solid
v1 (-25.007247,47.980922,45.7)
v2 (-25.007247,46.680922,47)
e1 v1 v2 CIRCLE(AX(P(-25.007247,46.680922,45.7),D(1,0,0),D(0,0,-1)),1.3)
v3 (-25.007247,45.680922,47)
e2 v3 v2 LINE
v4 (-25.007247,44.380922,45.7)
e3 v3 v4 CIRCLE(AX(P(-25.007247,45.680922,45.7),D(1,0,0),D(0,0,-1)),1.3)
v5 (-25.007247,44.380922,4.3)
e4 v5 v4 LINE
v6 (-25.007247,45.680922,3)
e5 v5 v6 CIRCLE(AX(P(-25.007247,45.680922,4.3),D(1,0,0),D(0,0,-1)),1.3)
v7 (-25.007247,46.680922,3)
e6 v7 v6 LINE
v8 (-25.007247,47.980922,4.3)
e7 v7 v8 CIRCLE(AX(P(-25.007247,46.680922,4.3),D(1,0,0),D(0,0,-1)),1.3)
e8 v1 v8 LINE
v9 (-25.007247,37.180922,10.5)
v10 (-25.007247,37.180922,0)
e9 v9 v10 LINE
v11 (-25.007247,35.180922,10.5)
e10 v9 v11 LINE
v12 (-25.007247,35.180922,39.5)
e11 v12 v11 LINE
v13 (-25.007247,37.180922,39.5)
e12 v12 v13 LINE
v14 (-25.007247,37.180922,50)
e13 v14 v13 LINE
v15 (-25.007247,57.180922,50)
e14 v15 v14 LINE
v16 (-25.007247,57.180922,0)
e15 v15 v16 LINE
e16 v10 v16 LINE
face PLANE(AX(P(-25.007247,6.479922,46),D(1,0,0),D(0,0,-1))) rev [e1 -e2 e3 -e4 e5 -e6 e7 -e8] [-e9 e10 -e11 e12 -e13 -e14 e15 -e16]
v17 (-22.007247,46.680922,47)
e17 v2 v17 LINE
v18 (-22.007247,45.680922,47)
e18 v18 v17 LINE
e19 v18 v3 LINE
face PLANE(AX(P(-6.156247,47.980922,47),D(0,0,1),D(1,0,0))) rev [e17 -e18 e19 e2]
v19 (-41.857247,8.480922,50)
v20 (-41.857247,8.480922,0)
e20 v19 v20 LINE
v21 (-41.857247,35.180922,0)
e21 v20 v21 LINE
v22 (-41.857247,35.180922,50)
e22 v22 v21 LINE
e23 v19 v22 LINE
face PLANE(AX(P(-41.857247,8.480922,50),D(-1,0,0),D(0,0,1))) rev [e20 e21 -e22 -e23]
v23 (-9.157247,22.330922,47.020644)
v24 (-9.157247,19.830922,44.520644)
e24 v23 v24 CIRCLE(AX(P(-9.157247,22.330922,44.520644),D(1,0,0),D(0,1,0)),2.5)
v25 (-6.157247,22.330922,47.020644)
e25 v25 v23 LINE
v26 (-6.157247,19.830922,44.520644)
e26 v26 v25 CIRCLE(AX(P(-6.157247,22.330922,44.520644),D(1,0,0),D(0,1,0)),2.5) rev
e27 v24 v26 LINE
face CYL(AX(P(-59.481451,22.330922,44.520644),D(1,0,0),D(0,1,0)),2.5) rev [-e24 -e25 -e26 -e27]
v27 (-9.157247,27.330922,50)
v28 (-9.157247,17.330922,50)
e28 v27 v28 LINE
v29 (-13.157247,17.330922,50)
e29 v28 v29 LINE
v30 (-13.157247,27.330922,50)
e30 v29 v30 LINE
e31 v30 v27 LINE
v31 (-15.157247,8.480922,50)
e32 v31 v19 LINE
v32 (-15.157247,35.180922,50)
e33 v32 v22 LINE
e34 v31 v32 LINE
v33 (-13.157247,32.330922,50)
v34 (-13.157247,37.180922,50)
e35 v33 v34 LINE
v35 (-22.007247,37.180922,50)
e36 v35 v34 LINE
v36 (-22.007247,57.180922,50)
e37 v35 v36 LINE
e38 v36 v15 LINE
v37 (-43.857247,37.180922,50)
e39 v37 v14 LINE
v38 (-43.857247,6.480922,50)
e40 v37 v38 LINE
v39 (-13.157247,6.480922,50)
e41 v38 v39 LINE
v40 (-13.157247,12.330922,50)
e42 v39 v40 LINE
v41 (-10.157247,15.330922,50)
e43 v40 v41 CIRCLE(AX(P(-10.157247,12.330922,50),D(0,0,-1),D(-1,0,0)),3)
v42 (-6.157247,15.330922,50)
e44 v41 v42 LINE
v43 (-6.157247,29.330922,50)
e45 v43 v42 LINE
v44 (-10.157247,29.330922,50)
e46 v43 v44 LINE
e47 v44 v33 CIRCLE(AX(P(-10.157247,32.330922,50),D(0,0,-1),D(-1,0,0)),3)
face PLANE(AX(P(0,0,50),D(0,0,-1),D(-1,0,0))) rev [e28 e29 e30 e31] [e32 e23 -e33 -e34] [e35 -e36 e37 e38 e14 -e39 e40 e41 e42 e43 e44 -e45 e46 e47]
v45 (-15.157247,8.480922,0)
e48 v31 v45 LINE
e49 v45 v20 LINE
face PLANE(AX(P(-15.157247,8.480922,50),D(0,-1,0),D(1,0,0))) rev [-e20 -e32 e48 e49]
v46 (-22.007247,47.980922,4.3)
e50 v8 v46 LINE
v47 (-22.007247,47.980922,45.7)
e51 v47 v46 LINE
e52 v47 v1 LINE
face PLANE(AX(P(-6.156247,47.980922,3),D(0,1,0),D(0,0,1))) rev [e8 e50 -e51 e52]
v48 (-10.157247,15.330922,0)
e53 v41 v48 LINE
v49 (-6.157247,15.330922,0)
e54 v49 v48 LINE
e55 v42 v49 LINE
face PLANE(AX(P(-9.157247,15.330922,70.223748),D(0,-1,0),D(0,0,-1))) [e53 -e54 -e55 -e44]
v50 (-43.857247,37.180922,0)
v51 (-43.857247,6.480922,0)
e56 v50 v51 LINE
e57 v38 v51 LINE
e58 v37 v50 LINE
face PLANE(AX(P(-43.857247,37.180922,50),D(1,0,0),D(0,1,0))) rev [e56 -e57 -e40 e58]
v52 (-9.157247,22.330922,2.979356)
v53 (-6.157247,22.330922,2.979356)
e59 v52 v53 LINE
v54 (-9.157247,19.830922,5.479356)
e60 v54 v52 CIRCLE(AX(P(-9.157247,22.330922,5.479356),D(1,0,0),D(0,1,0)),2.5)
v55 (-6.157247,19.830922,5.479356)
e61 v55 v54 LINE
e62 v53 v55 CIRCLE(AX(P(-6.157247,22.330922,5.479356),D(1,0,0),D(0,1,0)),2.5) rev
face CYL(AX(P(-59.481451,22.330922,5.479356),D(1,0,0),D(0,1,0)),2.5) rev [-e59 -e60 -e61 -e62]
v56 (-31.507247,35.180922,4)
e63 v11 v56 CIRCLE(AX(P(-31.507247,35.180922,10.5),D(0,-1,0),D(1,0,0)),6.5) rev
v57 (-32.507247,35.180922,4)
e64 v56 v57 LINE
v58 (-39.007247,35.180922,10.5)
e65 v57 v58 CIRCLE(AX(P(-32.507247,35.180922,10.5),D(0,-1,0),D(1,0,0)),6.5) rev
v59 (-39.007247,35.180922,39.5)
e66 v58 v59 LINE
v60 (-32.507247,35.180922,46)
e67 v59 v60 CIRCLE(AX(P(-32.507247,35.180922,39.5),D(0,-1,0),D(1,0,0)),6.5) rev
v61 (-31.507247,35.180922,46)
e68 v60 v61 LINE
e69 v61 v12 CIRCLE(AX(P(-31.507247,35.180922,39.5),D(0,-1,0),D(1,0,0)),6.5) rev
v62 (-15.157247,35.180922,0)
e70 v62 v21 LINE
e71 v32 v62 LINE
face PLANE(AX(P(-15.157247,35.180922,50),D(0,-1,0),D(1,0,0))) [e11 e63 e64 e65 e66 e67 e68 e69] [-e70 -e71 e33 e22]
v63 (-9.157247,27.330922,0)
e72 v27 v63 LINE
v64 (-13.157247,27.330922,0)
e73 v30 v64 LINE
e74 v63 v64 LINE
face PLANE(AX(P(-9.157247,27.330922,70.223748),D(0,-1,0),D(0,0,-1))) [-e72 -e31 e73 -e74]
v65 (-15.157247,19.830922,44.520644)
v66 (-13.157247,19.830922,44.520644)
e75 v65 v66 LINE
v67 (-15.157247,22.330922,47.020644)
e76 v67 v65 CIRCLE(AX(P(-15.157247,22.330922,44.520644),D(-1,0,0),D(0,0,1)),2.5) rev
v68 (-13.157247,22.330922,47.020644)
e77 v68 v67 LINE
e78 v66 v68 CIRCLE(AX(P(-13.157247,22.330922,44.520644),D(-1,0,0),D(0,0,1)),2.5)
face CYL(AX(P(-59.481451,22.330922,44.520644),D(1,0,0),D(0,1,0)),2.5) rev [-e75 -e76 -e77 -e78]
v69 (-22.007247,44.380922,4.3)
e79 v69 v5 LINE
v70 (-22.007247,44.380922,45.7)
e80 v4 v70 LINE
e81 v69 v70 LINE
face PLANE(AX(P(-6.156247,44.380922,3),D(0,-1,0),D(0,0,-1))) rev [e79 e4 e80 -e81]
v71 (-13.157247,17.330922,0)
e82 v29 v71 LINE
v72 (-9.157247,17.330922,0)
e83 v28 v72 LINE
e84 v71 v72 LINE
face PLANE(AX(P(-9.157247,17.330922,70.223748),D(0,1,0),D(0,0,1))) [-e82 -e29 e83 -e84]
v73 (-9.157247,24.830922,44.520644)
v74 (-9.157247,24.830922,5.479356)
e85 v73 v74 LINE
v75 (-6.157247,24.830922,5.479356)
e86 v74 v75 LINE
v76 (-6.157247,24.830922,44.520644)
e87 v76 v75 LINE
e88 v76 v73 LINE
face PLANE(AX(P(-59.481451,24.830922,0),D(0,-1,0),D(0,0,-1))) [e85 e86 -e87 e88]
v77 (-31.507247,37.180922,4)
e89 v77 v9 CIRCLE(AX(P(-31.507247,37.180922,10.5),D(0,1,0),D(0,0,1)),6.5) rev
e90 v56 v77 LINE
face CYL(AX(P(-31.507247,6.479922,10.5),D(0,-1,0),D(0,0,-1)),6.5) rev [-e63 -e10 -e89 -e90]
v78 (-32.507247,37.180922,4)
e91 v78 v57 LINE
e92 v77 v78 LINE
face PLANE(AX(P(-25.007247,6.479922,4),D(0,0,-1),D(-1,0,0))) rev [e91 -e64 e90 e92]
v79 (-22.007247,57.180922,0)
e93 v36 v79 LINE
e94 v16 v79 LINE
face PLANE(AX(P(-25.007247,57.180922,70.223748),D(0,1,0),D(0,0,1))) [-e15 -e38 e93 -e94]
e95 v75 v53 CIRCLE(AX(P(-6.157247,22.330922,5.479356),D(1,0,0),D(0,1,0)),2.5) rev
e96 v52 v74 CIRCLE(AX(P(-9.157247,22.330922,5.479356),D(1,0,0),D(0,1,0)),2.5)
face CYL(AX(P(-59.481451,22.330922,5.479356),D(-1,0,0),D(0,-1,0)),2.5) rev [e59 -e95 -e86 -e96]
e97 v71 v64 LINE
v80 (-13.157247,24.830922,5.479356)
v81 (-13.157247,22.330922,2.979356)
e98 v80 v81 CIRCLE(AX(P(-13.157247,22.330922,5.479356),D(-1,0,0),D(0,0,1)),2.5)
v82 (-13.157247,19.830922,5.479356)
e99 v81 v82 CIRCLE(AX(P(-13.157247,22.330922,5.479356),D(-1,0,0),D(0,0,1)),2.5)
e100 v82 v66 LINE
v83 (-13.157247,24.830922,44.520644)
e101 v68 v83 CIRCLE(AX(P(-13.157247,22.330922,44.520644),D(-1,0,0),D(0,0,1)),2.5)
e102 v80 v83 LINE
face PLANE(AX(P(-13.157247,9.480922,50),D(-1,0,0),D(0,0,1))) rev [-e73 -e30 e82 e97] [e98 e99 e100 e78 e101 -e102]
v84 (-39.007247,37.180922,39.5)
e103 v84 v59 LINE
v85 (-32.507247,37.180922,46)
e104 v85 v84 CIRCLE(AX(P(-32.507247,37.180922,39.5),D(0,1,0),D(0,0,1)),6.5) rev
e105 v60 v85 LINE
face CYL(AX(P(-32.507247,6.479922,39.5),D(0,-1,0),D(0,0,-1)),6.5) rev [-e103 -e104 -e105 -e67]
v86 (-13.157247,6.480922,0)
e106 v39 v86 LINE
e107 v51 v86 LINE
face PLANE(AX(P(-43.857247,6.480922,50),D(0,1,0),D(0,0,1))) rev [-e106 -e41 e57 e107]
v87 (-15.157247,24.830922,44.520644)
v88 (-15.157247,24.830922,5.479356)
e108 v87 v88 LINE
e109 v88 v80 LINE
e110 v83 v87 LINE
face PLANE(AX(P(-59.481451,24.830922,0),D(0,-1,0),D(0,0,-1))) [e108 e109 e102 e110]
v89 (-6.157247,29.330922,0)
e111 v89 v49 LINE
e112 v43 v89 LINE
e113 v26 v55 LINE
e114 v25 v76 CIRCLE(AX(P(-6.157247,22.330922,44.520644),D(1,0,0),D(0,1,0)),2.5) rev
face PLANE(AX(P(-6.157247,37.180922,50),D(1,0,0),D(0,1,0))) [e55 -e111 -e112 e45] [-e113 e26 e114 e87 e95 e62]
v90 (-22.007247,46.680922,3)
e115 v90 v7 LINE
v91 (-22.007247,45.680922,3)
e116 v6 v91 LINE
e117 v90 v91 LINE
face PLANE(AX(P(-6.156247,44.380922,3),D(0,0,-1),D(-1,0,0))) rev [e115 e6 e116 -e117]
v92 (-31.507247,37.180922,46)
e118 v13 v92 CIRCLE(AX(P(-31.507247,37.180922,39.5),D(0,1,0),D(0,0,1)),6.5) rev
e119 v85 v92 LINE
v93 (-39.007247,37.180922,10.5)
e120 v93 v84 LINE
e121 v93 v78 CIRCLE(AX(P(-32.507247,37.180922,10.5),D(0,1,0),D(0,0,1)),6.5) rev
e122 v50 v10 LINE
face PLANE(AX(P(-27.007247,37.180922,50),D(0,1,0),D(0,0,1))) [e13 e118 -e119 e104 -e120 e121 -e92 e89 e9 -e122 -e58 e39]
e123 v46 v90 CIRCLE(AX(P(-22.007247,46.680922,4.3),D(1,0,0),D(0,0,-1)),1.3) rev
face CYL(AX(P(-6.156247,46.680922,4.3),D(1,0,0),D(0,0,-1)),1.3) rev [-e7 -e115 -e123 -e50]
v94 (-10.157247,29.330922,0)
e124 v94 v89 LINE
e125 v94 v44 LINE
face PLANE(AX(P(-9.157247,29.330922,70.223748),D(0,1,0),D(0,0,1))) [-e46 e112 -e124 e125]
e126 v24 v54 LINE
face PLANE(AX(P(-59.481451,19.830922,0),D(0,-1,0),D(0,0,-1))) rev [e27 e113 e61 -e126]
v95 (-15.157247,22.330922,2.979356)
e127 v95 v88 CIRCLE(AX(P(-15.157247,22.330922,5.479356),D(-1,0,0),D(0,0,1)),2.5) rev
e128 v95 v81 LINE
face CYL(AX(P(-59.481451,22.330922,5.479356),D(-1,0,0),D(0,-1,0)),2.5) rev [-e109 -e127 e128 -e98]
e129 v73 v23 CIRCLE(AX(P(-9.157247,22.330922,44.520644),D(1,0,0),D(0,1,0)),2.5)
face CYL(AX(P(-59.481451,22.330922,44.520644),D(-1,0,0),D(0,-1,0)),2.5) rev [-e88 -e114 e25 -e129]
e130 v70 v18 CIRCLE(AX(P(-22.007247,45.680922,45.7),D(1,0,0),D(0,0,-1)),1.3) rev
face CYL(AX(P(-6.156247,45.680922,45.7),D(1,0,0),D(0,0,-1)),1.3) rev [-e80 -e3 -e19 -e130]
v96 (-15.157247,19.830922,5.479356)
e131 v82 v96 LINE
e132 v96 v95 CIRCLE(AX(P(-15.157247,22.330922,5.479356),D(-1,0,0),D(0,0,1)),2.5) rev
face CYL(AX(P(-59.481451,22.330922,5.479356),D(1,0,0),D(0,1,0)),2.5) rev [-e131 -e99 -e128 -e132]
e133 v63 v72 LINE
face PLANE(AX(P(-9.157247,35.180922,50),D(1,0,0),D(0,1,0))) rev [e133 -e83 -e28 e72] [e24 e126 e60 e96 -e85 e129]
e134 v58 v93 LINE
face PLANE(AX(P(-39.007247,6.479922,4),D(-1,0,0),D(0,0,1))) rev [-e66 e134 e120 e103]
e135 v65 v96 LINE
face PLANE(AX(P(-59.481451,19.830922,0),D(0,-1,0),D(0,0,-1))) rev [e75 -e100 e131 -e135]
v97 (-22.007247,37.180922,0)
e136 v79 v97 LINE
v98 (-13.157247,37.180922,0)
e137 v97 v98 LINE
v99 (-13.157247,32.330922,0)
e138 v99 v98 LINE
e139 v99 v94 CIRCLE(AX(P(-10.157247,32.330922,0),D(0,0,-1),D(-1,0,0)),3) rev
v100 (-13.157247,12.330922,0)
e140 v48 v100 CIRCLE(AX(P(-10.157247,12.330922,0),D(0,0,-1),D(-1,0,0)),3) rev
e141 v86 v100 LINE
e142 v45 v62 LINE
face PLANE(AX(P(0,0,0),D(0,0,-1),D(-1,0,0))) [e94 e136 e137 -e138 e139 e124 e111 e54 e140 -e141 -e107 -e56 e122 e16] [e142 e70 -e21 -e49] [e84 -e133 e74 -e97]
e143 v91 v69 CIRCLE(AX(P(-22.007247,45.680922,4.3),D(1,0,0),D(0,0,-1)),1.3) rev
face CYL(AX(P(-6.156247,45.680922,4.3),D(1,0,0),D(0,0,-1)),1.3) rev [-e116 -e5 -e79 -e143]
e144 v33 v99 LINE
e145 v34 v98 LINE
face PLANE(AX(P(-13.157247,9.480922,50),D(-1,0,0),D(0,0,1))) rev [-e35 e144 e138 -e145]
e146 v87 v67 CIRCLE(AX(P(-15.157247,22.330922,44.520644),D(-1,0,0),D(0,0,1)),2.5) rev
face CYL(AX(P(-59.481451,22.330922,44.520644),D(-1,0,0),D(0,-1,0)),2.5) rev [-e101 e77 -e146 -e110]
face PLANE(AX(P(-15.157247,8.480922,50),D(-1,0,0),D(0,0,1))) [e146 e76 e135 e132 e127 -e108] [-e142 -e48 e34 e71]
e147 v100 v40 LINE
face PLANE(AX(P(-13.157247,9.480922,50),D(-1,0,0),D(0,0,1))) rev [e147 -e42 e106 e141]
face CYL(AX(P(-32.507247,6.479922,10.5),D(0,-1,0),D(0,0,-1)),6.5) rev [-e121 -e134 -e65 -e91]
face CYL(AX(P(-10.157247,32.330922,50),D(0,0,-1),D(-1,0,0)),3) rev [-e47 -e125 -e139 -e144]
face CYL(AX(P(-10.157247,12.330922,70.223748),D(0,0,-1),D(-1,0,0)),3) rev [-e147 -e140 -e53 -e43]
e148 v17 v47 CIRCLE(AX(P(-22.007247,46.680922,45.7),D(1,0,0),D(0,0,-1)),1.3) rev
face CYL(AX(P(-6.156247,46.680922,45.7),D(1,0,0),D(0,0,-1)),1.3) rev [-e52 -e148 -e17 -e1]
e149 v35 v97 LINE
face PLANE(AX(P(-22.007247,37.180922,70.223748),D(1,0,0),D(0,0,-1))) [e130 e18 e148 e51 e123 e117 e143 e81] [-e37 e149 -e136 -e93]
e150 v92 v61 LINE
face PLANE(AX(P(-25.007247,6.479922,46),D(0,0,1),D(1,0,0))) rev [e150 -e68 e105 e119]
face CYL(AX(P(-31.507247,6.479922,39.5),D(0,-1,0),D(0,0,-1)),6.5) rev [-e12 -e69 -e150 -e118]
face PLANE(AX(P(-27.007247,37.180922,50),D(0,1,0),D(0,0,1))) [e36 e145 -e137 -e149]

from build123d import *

# Parameters (mm, degrees)
CROQUIS3_W              = 26.7
CROQUIS3_H              = 26.7
CROQUIS3_W_2            = 4
CROQUIS3_H_2            = 25.7
SALIENTE_EXTRUIR1_DEPTH = 50
CORTAR_EXTRUIR14_REACH  = 74.827
REDONDEO2_R             = 2.5
CORTAR_EXTRUIR19_REACH  = 75.253
CROQUIS18_W             = 7
CROQUIS18_H             = 42
CROQUIS19_W             = 4
CROQUIS19_H             = 2
CROQUIS19_W_2           = 3
CROQUIS19_H_2           = 20
SALIENTE_EXTRUIR3_DEPTH = 50
CORTAR_EXTRUIR20_REACH  = 80.262
CROQUIS20_W             = 44
CROQUIS20_H             = 3.6
CORTAR_EXTRUIR21_REACH  = 89.71
REDONDEO6_R             = 3
REDONDEO9_R             = 1.3
CORTAR_EXTRUIR22_REACH  = 75.253
CROQUIS22_W             = 7
CROQUIS22_H             = 42
REDONDEO10_R            = 6.5


with BuildPart() as part:
    # Croquis3 → Saliente-Extruir1 (new body)
    with BuildSketch(Plane.XY):
        Polygon((-43.857247249, 6.480922369), (-6.157247249, 6.480922369), (-6.157247249, 37.180922369), (-27.007247249, 37.180922369), (-43.857247249, 37.180922369), align=None)
        with Locations((-28.507247249, 21.830922369)):
            Rectangle(CROQUIS3_W, CROQUIS3_H, mode=Mode.SUBTRACT)
        with Locations((-11.157247249, 22.330922369)):
            Rectangle(CROQUIS3_W_2, CROQUIS3_H_2, mode=Mode.SUBTRACT)
    extrude(amount=SALIENTE_EXTRUIR1_DEPTH)

    # Cortar-Extruir14: up to this face of the body (flat: up to its plane)
    cortar_extruir14_end = Plane(part.part.faces().sort_by_distance((-15.157247249, 21.830922369, 25))[0])
    # Croquis14 → Cortar-Extruir14 (cut, up to the picked face)
    with BuildSketch(Plane(origin=(-6.157247249, 0, 0), x_dir=(0, 0, -1), z_dir=(1, 0, 0)), mode=Mode.PRIVATE) as cortar_extruir14_sk1:
        Polygon((-2.979356026, 22.330922369), (-2.979356026, 19.830922369), (-47.020643974, 19.830922369), (-47.020643974, 22.330922369), (-47.020643974, 24.830922369), (-2.979356026, 24.830922369), align=None)
    cortar_extruir14_tool1 = split(extrude(cortar_extruir14_sk1.sketch, amount=-CORTAR_EXTRUIR14_REACH, mode=Mode.PRIVATE), bisect_by=cortar_extruir14_end, keep=Keep.BOTH, mode=Mode.PRIVATE)
    add(cortar_extruir14_tool1.solids().sort_by(Axis((-6.157247, 22.330922, 25), (-1, 0, 0)))[0], mode=Mode.SUBTRACT)

    # Redondeo2
    redondeo2_edges = [part.edges().sort_by_distance(p)[0] for p in [
        (-14.157247249, 24.830922369, 2.979356026),
        (-7.657247249, 24.830922369, 2.979356026),
        (-7.657247249, 19.830922369, 2.979356026),
        (-14.157247249, 19.830922369, 2.979356026),
        (-14.157247249, 24.830922369, 47.020643974),
        (-7.657247249, 24.830922369, 47.020643974),
        (-7.657247249, 19.830922369, 47.020643974),
        (-14.157247249, 19.830922369, 47.020643974),
    ]]
    fillet(redondeo2_edges, radius=REDONDEO2_R - 0.0001)  # a hair under: the kernel refuses the full size

    # Croquis18 → Cortar-Extruir19 (cut, up to next)
    with BuildSketch(Plane(origin=(0, 37.180922369, 0), x_dir=(1, 0, 0), z_dir=(0, 1, 0)), mode=Mode.PRIVATE) as cortar_extruir19_sk1:
        with Locations((-28.507247249, -25)):
            Rectangle(CROQUIS18_W, CROQUIS18_H)
    cortar_extruir19_tool1 = extrude(cortar_extruir19_sk1.sketch, amount=-CORTAR_EXTRUIR19_REACH, mode=Mode.PRIVATE) & part.part
    add(cortar_extruir19_tool1.solids().sort_by_distance((-28.507247, 37.180922, 25))[0], mode=Mode.SUBTRACT)

    # Croquis19 → Saliente-Extruir3 (add)
    with BuildSketch(Plane(origin=(0, 0, 0), x_dir=(-1, 0, 0), z_dir=(0, 0, -1))):
        with Locations((11.157247249, 16.330922369)):
            Rectangle(CROQUIS19_W, CROQUIS19_H)
        with Locations((11.157247249, 28.330922369)):
            Rectangle(CROQUIS19_W, CROQUIS19_H)
        with Locations((23.507247249, 47.180922369)):
            Rectangle(CROQUIS19_W_2, CROQUIS19_H_2)
    extrude(amount=-SALIENTE_EXTRUIR3_DEPTH)

    # Croquis20 → Cortar-Extruir20 (cut, up to next)
    with BuildSketch(Plane.ZY.offset(25.007247249), mode=Mode.PRIVATE) as cortar_extruir20_sk1:
        with Locations((25, 46.180922369)):
            Rectangle(CROQUIS20_W, CROQUIS20_H)
    cortar_extruir20_tool1 = extrude(cortar_extruir20_sk1.sketch, amount=-CORTAR_EXTRUIR20_REACH, mode=Mode.PRIVATE) & part.part
    add(cortar_extruir20_tool1.solids().sort_by_distance((-25.007247, 46.180922, 25))[0], mode=Mode.SUBTRACT)

    # Croquis21 → Cortar-Extruir21 (cut, up to next)
    with BuildSketch(Plane(origin=(0, 0, 0), x_dir=(-1, 0, 0), z_dir=(0, 0, -1)), mode=Mode.PRIVATE) as cortar_extruir21_sk1:
        Polygon((13.157247249, 35.180922369), (13.157247249, 37.180922369), (6.157247249, 37.180922369), (6.157247249, 29.330922369), (9.157247249, 29.330922369), (9.157247249, 35.180922369), align=None)
    cortar_extruir21_tool1 = extrude(cortar_extruir21_sk1.sketch, amount=-CORTAR_EXTRUIR21_REACH, mode=Mode.PRIVATE) & part.part
    # Croquis21 → Cortar-Extruir21 (cut, up to next)
    with BuildSketch(Plane(origin=(0, 0, 0), x_dir=(-1, 0, 0), z_dir=(0, 0, -1)), mode=Mode.PRIVATE) as cortar_extruir21_sk2:
        Polygon((6.157247249, 9.480922369), (6.157247249, 15.330922369), (9.157247249, 15.330922369), (9.157247249, 9.480922369), (13.157247249, 9.480922369), (13.157247249, 6.480922369), (6.157247249, 6.480922369), align=None)
    cortar_extruir21_tool2 = extrude(cortar_extruir21_sk2.sketch, amount=-CORTAR_EXTRUIR21_REACH, mode=Mode.PRIVATE) & part.part
    add(cortar_extruir21_tool1.solids().sort_by_distance((-8.544727, 33.997602, 0))[0], mode=Mode.SUBTRACT)
    add(cortar_extruir21_tool2.solids().sort_by_distance((-8.746741, 9.995417, 0))[0], mode=Mode.SUBTRACT)

    # Redondeo6
    redondeo6_edges = [part.edges().sort_by_distance(p)[0] for p in [
        (-13.157247249, 15.330922369, 25),
        (-13.157247249, 29.330922369, 25),
    ]]
    fillet(redondeo6_edges, radius=REDONDEO6_R)

    # Redondeo9
    redondeo9_edges = [part.edges().sort_by_distance(p)[0] for p in [
        (-23.507247249, 47.980922369, 3),
        (-23.507247249, 47.980922369, 47),
        (-23.507247249, 44.380922369, 47),
        (-23.507247249, 44.380922369, 3),
    ]]
    fillet(redondeo9_edges, radius=REDONDEO9_R)

    # Croquis22 → Cortar-Extruir22 (cut, up to next)
    with BuildSketch(Plane(origin=(0, 37.180922369, 0), x_dir=(1, 0, 0), z_dir=(0, 1, 0)), mode=Mode.PRIVATE) as cortar_extruir22_sk1:
        with Locations((-35.507247249, -25)):
            Rectangle(CROQUIS22_W, CROQUIS22_H)
    cortar_extruir22_tool1 = extrude(cortar_extruir22_sk1.sketch, amount=-CORTAR_EXTRUIR22_REACH, mode=Mode.PRIVATE) & part.part
    add(cortar_extruir22_tool1.solids().sort_by_distance((-35.507247, 37.180922, 25))[0], mode=Mode.SUBTRACT)

    # Redondeo10
    redondeo10_edges = [part.edges().sort_by_distance(p)[0] for p in [
        (-25.007247249, 36.180922369, 46),
        (-25.007247249, 36.180922369, 4),
        (-39.007247249, 36.180922369, 4),
        (-39.007247249, 36.180922369, 46),
    ]]
    fillet(redondeo10_edges, radius=REDONDEO10_R)


solid = part.part
